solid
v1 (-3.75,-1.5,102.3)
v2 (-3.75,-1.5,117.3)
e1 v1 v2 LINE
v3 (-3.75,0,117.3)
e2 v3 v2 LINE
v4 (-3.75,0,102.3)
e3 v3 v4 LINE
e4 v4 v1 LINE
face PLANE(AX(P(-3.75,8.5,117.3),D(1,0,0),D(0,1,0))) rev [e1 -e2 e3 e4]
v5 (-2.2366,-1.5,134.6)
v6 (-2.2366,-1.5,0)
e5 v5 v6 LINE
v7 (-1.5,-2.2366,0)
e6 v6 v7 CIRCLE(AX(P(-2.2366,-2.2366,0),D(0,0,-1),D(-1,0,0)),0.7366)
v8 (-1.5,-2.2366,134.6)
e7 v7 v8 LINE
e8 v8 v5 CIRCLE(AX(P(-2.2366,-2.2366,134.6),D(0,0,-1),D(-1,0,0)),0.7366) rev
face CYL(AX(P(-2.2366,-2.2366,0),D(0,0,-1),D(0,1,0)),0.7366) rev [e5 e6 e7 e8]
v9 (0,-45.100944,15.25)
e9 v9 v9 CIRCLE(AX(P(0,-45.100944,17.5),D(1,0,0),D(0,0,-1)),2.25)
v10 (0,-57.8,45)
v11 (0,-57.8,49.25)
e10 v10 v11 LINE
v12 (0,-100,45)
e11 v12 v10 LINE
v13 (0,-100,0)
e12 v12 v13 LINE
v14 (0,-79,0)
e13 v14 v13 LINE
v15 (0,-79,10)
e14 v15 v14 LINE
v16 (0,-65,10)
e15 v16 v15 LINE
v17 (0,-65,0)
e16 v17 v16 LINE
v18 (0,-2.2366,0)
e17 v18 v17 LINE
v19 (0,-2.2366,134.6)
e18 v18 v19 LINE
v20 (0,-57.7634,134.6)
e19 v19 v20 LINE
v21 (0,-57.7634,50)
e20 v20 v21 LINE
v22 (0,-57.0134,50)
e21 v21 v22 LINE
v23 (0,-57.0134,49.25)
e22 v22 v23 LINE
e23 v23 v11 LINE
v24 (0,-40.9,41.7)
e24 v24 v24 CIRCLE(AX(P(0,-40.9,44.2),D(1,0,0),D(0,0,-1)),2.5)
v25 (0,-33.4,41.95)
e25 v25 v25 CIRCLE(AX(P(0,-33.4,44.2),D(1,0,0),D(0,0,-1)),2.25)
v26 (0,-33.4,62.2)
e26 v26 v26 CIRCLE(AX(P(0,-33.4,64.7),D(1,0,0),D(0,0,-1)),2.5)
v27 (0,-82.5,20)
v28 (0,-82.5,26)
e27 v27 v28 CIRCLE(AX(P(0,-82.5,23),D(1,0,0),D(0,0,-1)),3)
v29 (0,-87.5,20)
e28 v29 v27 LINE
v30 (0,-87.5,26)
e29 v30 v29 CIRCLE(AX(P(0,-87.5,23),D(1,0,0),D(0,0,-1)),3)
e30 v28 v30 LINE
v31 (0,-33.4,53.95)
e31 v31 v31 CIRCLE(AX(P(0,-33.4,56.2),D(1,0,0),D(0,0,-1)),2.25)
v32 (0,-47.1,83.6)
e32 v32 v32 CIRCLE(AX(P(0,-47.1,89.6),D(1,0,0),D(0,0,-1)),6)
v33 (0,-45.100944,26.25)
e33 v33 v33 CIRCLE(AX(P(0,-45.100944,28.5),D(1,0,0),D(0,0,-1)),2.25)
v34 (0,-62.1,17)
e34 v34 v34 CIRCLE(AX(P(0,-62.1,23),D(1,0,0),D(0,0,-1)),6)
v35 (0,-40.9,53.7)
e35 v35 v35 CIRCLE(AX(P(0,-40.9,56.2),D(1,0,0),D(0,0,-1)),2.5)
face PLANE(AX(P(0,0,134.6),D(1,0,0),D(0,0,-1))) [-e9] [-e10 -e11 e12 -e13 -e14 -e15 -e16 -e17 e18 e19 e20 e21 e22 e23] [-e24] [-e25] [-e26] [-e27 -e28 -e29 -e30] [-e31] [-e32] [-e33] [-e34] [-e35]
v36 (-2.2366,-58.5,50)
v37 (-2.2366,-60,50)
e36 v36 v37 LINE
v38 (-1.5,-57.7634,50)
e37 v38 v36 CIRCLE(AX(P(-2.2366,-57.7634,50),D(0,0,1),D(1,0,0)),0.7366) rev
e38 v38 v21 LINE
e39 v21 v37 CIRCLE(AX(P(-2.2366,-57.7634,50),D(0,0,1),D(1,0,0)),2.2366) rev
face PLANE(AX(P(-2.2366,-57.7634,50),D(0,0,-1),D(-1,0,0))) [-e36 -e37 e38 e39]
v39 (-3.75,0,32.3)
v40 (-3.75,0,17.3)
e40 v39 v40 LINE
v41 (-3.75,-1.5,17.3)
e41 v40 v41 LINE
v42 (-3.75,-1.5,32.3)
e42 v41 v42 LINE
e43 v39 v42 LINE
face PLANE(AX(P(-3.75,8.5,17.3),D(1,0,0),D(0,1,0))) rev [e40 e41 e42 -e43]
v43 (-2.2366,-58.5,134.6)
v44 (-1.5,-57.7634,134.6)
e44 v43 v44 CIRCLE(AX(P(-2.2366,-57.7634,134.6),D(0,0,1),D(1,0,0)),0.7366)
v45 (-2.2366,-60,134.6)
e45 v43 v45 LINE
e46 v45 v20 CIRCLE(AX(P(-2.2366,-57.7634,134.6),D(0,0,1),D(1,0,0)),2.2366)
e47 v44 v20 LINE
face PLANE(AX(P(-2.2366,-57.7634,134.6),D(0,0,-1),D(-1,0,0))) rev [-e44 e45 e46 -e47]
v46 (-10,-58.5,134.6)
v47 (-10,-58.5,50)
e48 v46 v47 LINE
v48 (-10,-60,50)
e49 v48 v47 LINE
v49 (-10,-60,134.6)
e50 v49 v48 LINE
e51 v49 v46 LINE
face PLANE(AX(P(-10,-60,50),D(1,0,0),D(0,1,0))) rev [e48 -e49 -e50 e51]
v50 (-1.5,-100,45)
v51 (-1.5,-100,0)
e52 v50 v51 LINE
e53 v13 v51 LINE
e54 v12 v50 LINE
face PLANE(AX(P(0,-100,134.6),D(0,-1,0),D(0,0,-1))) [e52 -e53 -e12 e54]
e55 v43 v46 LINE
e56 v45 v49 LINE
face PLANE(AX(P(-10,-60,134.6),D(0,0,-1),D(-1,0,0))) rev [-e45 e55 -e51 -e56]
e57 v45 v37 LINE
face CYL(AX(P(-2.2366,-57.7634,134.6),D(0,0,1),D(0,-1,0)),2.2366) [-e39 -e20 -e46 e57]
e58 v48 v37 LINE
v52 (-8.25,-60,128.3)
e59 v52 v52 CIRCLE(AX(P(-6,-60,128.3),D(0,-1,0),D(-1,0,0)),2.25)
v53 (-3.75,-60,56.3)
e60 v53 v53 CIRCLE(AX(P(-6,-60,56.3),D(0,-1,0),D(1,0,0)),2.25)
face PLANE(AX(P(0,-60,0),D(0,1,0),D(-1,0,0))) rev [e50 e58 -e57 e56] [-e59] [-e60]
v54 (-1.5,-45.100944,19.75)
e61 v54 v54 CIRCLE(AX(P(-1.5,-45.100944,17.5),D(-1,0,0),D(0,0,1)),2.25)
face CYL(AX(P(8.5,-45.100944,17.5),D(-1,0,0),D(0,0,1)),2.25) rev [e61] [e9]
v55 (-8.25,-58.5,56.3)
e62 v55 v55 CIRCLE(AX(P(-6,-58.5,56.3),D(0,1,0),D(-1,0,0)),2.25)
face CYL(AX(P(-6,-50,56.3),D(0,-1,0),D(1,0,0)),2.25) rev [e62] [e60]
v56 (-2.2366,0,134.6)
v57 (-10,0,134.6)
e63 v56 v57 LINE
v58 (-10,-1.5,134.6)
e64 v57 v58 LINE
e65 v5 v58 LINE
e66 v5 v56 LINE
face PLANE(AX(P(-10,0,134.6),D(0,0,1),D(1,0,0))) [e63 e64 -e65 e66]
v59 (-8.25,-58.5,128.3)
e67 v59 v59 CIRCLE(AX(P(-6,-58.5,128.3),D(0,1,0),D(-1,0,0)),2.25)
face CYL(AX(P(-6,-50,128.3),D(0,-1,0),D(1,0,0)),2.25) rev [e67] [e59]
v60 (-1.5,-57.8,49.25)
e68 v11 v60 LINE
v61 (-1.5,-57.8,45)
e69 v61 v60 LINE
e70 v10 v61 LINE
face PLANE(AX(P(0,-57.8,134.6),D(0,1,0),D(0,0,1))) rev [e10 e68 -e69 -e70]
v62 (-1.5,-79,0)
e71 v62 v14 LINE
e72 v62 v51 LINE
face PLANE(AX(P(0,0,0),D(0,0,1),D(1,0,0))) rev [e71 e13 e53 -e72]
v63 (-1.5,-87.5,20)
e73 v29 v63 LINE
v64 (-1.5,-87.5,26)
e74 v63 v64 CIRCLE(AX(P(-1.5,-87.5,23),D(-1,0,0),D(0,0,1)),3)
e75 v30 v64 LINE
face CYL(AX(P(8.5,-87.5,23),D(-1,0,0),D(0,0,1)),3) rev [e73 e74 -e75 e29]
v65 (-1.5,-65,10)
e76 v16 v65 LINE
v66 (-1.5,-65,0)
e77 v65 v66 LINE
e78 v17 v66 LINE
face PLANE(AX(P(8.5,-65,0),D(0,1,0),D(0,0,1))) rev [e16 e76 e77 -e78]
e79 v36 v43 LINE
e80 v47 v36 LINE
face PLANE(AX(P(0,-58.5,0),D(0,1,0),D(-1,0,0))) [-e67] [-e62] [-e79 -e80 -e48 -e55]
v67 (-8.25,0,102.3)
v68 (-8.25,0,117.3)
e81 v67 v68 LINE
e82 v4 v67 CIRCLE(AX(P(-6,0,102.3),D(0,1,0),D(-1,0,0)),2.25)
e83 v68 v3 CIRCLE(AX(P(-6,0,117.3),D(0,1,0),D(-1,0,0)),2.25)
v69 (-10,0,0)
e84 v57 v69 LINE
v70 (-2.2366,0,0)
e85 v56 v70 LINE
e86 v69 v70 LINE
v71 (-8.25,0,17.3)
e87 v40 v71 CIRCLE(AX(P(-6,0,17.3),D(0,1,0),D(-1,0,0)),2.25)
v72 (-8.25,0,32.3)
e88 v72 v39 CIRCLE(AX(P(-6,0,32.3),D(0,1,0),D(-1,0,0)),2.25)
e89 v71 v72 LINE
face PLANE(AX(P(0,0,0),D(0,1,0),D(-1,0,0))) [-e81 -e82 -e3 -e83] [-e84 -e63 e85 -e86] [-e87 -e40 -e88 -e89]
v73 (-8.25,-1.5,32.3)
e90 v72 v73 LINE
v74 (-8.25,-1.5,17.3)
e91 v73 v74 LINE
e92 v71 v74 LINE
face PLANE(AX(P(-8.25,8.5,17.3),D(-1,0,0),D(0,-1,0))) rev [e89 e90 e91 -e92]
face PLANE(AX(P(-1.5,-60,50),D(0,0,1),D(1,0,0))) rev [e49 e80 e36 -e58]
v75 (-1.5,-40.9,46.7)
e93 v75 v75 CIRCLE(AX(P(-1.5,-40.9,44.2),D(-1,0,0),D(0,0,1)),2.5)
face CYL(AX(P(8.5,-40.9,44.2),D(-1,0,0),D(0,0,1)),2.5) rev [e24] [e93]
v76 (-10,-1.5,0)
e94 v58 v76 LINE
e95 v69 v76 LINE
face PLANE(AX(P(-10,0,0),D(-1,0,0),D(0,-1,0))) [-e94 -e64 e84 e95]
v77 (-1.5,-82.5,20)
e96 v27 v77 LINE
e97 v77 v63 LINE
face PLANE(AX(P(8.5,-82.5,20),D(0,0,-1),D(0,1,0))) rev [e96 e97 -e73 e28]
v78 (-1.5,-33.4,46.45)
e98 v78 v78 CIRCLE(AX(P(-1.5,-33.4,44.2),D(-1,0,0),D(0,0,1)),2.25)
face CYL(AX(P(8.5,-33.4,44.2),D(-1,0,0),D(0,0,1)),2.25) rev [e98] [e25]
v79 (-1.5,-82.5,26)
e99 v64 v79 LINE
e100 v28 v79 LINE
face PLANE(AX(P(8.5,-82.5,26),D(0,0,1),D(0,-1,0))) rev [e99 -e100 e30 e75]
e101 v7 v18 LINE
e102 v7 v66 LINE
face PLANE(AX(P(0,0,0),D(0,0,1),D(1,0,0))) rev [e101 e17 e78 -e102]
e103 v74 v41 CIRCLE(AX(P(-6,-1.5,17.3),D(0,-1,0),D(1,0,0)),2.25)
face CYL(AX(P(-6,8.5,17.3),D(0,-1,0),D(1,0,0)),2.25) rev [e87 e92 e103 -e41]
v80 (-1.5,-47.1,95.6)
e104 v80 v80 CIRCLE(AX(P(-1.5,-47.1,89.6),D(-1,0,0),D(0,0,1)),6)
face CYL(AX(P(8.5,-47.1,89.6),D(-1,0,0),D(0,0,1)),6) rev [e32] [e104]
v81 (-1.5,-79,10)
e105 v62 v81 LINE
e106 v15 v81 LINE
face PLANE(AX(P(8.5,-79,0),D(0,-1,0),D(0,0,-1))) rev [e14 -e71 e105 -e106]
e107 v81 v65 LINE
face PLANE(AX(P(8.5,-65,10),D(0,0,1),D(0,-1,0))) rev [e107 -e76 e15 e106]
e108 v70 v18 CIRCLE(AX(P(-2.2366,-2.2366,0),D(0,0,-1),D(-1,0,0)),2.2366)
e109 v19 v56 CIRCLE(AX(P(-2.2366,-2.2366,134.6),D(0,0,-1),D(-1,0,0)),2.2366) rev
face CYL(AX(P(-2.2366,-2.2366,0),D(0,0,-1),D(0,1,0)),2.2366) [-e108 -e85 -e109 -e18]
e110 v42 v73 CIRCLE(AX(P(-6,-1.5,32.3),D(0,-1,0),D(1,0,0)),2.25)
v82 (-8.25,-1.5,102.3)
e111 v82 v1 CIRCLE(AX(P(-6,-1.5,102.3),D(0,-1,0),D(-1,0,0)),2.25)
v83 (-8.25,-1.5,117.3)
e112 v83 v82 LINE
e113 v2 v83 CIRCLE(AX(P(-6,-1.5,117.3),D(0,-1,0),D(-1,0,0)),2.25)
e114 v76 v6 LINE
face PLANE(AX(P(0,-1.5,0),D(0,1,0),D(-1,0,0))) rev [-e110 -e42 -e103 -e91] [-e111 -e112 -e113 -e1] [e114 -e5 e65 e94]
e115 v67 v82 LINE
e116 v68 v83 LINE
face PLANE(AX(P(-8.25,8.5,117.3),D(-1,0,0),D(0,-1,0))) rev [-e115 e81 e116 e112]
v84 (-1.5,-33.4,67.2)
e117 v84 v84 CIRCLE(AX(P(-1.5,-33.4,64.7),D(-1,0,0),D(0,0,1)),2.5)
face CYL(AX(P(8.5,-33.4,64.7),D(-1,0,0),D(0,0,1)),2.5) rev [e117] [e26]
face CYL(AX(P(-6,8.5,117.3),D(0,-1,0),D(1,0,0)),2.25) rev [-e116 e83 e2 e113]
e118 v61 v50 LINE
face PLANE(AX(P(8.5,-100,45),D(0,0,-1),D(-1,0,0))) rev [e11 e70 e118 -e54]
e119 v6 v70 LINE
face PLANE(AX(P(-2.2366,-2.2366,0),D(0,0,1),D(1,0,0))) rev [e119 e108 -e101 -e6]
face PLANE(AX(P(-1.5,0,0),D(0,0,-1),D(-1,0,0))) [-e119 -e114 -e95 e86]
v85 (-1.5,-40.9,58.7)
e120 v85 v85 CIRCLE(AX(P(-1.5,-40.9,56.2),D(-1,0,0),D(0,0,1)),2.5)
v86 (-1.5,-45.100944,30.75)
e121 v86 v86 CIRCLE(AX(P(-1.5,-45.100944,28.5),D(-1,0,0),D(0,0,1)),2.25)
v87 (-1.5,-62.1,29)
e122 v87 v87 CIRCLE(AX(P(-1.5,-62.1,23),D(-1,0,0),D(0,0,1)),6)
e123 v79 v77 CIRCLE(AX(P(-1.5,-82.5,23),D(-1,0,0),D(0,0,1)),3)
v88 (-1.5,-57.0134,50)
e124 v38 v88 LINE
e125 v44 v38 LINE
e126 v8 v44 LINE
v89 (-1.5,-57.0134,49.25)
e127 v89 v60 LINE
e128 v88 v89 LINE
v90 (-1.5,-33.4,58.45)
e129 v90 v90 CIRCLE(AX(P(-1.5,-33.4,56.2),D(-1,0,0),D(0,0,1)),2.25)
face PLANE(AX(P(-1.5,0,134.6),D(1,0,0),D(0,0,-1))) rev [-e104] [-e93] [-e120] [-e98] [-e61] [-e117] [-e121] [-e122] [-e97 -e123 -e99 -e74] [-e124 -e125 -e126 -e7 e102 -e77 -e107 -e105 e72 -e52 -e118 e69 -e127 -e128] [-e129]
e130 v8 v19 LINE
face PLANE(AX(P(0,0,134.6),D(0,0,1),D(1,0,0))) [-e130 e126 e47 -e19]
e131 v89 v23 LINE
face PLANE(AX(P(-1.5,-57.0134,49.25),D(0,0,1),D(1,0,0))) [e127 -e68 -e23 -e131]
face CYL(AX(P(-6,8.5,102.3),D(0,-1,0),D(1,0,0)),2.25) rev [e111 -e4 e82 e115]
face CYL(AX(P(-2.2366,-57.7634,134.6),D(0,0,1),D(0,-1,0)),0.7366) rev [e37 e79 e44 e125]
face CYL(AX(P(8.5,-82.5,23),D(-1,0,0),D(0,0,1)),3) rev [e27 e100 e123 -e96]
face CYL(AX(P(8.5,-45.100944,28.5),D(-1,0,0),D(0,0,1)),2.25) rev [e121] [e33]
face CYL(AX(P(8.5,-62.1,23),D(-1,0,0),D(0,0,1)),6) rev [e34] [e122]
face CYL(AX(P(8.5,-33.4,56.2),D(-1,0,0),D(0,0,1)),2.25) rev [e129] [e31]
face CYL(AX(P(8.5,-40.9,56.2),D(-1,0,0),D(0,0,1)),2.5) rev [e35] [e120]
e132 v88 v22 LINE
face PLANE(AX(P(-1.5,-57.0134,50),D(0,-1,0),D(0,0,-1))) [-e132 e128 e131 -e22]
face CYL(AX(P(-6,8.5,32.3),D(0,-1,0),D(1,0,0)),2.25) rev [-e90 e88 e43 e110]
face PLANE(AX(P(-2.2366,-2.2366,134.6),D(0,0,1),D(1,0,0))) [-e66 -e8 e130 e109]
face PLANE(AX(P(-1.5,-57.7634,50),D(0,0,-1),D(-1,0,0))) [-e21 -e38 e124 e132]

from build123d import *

# Parameters (mm, degrees)
SKETCH_1_W                        = 1.5
SKETCH_1_H                        = 100
SM_BASE_FLANGE_1_DEPTH            = 134.6
SKETCH_6_R                        = 2.25
SKETCH_6_R_2                      = 2.5
SKETCH_6_R_3                      = 6
SKETCH_6_W                        = 89.6
SKETCH_6_H                        = 40
SKETCH_6_W_2                      = 10
SKETCH_6_H_2                      = 14
CUT_EXTRUDE_1_DEPTH               = 10
SKETCH_10_W                       = 5
SKETCH_10_H                       = 2.2
CUT_EXTRUDE_2_DEPTH               = 10
SM_EDGE_FLANGE_2_STRIP_W          = 7.4732
SM_EDGE_FLANGE_2_STRIP_H          = 1.5
SM_EDGE_FLANGE_2_STRIP_CUT_DEPTH  = 84.6
SM_EDGE_FLANGE_2_RELIEF_W         = 8.2232
SM_EDGE_FLANGE_2_RELIEF_H         = 0.75
SM_EDGE_FLANGE_2_RELIEF_CUT_DEPTH = 1.5
SM_EDGE_FLANGE_2_DEPTH            = 84.6
SM_EDGE_FLANGE_3_STRIP_W          = 7.4732
SM_EDGE_FLANGE_3_STRIP_H          = 1.5
SM_EDGE_FLANGE_3_STRIP_CUT_DEPTH  = 134.6
SM_EDGE_FLANGE_3_DEPTH            = 134.6
CUT_EXTRUDE_3_DEPTH               = 10
SKETCH_18_R                       = 2.25
CUT_EXTRUDE_4_DEPTH               = 10


# Sheet-metal steps are written as plain solids
with BuildPart() as part:
    # Sketch 1 → 基体-法兰1 (new body)
    with BuildSketch(Plane.XY):
        with Locations((-0.75, -50)):
            Rectangle(SKETCH_1_W, SKETCH_1_H)
    extrude(amount=SM_BASE_FLANGE_1_DEPTH)

    # 草图6 → 切除-拉伸1 (cut)
    with BuildSketch(Plane.ZY.offset(1.5)):
        with Locations((17.5, -45.10094434)):
            Circle(SKETCH_6_R)
        with Locations((28.5, -45.10094434)):
            Circle(SKETCH_6_R)
        with Locations((44.2, -33.4)):
            Circle(SKETCH_6_R)
        with Locations((56.2, -33.4)):
            Circle(SKETCH_6_R)
        with Locations((44.2, -40.9)):
            Circle(SKETCH_6_R_2)
        with Locations((56.2, -40.9)):
            Circle(SKETCH_6_R_2)
        with Locations((64.7, -33.4)):
            Circle(SKETCH_6_R_2)
        with Locations((89.6, -47.1)):
            Circle(SKETCH_6_R_3)
        with Locations((23, -62.1)):
            Circle(SKETCH_6_R_3)
        with Locations((89.8, -80)):
            Rectangle(SKETCH_6_W, SKETCH_6_H)
        with Locations((5, -72)):
            Rectangle(SKETCH_6_W_2, SKETCH_6_H_2)
        with BuildLine():
            Line((20, -82.5), (20, -87.5))
            ThreePointArc((20, -87.5), (23, -90.5), (26, -87.5))
            Line((26, -87.5), (26, -82.5))
            ThreePointArc((26, -82.5), (23, -79.5), (20, -82.5))
        make_face()
    extrude(amount=-CUT_EXTRUDE_1_DEPTH, mode=Mode.SUBTRACT)

    # 草图10 → 切除-拉伸2 (cut)
    with BuildSketch(Plane.ZY.offset(1.5)):
        with Locations((47.5, -58.9)):
            Rectangle(SKETCH_10_W, SKETCH_10_H)
    extrude(amount=-CUT_EXTRUDE_2_DEPTH, mode=Mode.SUBTRACT)

    # 边线-法兰2 strip (across the edge) → 边线-法兰2 strip cut (cut)
    with BuildSketch(Plane(origin=(-1.5, -60, 50), x_dir=(0, 1, 0), z_dir=(0, 0, 1))):
        with Locations((-1.5, -0.75)):
            Rectangle(SM_EDGE_FLANGE_2_STRIP_W, SM_EDGE_FLANGE_2_STRIP_H)
    extrude(amount=SM_EDGE_FLANGE_2_STRIP_CUT_DEPTH, mode=Mode.SUBTRACT)

    # 边线-法兰2 relief (on the sheet) → 边线-法兰2 relief cut (cut)
    with BuildSketch(Plane(origin=(-1.5, -57.7634, 50), x_dir=(0, 1, 0), z_dir=(-1, 0, 0))):
        with Locations((-3.3616, 0.375)):
            Rectangle(SM_EDGE_FLANGE_2_RELIEF_W, SM_EDGE_FLANGE_2_RELIEF_H)
    extrude(amount=-SM_EDGE_FLANGE_2_RELIEF_CUT_DEPTH, mode=Mode.SUBTRACT)

    # 边线-法兰2 section (across the edge) → 边线-法兰2 (add)
    with BuildSketch(Plane(origin=(-1.5, -60, 50), x_dir=(0, 1, 0), z_dir=(0, 0, 1))):
        with BuildLine():
            Line((0, 0.7366), (0, 8.5))
            Line((0, 8.5), (1.5, 8.5))
            Line((1.5, 8.5), (1.5, 0.7366))
            ThreePointArc((1.5, 0.7366), (1.715745145, 0.215745145), (2.2366, 0))
            Line((2.2366, 0), (2.2366, -1.5))
            ThreePointArc((2.2366, -1.5), (0.655084973, -0.844915027), (0, 0.7366))
        make_face()
    extrude(amount=SM_EDGE_FLANGE_2_DEPTH)

    # 边线-法兰3 strip (across the edge) → 边线-法兰3 strip cut (cut)
    with BuildSketch(Plane(origin=(-1.5, 0, 134.6), x_dir=(0, -1, 0), z_dir=(0, 0, -1))):
        with Locations((-1.5, -0.75)):
            Rectangle(SM_EDGE_FLANGE_3_STRIP_W, SM_EDGE_FLANGE_3_STRIP_H)
    extrude(amount=SM_EDGE_FLANGE_3_STRIP_CUT_DEPTH, mode=Mode.SUBTRACT)

    # 边线-法兰3 section (across the edge) → 边线-法兰3 (add)
    with BuildSketch(Plane(origin=(-1.5, 0, 134.6), x_dir=(0, -1, 0), z_dir=(0, 0, -1))):
        with BuildLine():
            Line((0, 0.7366), (0, 8.5))
            Line((0, 8.5), (1.5, 8.5))
            Line((1.5, 8.5), (1.5, 0.7366))
            ThreePointArc((1.5, 0.7366), (1.715745145, 0.215745145), (2.2366, 0))
            Line((2.2366, 0), (2.2366, -1.5))
            ThreePointArc((2.2366, -1.5), (0.655084973, -0.844915027), (0, 0.7366))
        make_face()
    extrude(amount=SM_EDGE_FLANGE_3_DEPTH)

    # 草图17 → 切除-拉伸3 (cut)
    with BuildSketch(Plane.XZ.offset(1.5)):
        with BuildLine():
            Line((-8.25, 17.3), (-8.25, 32.3))
            ThreePointArc((-8.25, 32.3), (-6, 34.55), (-3.75, 32.3))
            Line((-3.75, 32.3), (-3.75, 17.3))
            ThreePointArc((-3.75, 17.3), (-6, 15.05), (-8.25, 17.3))
        make_face()
        with BuildLine():
            Line((-3.75, 117.3), (-3.75, 102.3))
            ThreePointArc((-3.75, 102.3), (-6, 100.05), (-8.25, 102.3))
            Line((-8.25, 102.3), (-8.25, 117.3))
            ThreePointArc((-8.25, 117.3), (-6, 119.55), (-3.75, 117.3))
        make_face()
    extrude(amount=-CUT_EXTRUDE_3_DEPTH, mode=Mode.SUBTRACT)

    # 草图18 → 切除-拉伸4 (cut)
    with BuildSketch(Plane.XZ.offset(60)):
        with Locations((-6, 56.3)):
            Circle(SKETCH_18_R)
        with Locations(Location((-6, 128.3, 0), (0, 0, 180))):
            Circle(SKETCH_18_R)
    extrude(amount=-CUT_EXTRUDE_4_DEPTH, mode=Mode.SUBTRACT)


solid = part.part
